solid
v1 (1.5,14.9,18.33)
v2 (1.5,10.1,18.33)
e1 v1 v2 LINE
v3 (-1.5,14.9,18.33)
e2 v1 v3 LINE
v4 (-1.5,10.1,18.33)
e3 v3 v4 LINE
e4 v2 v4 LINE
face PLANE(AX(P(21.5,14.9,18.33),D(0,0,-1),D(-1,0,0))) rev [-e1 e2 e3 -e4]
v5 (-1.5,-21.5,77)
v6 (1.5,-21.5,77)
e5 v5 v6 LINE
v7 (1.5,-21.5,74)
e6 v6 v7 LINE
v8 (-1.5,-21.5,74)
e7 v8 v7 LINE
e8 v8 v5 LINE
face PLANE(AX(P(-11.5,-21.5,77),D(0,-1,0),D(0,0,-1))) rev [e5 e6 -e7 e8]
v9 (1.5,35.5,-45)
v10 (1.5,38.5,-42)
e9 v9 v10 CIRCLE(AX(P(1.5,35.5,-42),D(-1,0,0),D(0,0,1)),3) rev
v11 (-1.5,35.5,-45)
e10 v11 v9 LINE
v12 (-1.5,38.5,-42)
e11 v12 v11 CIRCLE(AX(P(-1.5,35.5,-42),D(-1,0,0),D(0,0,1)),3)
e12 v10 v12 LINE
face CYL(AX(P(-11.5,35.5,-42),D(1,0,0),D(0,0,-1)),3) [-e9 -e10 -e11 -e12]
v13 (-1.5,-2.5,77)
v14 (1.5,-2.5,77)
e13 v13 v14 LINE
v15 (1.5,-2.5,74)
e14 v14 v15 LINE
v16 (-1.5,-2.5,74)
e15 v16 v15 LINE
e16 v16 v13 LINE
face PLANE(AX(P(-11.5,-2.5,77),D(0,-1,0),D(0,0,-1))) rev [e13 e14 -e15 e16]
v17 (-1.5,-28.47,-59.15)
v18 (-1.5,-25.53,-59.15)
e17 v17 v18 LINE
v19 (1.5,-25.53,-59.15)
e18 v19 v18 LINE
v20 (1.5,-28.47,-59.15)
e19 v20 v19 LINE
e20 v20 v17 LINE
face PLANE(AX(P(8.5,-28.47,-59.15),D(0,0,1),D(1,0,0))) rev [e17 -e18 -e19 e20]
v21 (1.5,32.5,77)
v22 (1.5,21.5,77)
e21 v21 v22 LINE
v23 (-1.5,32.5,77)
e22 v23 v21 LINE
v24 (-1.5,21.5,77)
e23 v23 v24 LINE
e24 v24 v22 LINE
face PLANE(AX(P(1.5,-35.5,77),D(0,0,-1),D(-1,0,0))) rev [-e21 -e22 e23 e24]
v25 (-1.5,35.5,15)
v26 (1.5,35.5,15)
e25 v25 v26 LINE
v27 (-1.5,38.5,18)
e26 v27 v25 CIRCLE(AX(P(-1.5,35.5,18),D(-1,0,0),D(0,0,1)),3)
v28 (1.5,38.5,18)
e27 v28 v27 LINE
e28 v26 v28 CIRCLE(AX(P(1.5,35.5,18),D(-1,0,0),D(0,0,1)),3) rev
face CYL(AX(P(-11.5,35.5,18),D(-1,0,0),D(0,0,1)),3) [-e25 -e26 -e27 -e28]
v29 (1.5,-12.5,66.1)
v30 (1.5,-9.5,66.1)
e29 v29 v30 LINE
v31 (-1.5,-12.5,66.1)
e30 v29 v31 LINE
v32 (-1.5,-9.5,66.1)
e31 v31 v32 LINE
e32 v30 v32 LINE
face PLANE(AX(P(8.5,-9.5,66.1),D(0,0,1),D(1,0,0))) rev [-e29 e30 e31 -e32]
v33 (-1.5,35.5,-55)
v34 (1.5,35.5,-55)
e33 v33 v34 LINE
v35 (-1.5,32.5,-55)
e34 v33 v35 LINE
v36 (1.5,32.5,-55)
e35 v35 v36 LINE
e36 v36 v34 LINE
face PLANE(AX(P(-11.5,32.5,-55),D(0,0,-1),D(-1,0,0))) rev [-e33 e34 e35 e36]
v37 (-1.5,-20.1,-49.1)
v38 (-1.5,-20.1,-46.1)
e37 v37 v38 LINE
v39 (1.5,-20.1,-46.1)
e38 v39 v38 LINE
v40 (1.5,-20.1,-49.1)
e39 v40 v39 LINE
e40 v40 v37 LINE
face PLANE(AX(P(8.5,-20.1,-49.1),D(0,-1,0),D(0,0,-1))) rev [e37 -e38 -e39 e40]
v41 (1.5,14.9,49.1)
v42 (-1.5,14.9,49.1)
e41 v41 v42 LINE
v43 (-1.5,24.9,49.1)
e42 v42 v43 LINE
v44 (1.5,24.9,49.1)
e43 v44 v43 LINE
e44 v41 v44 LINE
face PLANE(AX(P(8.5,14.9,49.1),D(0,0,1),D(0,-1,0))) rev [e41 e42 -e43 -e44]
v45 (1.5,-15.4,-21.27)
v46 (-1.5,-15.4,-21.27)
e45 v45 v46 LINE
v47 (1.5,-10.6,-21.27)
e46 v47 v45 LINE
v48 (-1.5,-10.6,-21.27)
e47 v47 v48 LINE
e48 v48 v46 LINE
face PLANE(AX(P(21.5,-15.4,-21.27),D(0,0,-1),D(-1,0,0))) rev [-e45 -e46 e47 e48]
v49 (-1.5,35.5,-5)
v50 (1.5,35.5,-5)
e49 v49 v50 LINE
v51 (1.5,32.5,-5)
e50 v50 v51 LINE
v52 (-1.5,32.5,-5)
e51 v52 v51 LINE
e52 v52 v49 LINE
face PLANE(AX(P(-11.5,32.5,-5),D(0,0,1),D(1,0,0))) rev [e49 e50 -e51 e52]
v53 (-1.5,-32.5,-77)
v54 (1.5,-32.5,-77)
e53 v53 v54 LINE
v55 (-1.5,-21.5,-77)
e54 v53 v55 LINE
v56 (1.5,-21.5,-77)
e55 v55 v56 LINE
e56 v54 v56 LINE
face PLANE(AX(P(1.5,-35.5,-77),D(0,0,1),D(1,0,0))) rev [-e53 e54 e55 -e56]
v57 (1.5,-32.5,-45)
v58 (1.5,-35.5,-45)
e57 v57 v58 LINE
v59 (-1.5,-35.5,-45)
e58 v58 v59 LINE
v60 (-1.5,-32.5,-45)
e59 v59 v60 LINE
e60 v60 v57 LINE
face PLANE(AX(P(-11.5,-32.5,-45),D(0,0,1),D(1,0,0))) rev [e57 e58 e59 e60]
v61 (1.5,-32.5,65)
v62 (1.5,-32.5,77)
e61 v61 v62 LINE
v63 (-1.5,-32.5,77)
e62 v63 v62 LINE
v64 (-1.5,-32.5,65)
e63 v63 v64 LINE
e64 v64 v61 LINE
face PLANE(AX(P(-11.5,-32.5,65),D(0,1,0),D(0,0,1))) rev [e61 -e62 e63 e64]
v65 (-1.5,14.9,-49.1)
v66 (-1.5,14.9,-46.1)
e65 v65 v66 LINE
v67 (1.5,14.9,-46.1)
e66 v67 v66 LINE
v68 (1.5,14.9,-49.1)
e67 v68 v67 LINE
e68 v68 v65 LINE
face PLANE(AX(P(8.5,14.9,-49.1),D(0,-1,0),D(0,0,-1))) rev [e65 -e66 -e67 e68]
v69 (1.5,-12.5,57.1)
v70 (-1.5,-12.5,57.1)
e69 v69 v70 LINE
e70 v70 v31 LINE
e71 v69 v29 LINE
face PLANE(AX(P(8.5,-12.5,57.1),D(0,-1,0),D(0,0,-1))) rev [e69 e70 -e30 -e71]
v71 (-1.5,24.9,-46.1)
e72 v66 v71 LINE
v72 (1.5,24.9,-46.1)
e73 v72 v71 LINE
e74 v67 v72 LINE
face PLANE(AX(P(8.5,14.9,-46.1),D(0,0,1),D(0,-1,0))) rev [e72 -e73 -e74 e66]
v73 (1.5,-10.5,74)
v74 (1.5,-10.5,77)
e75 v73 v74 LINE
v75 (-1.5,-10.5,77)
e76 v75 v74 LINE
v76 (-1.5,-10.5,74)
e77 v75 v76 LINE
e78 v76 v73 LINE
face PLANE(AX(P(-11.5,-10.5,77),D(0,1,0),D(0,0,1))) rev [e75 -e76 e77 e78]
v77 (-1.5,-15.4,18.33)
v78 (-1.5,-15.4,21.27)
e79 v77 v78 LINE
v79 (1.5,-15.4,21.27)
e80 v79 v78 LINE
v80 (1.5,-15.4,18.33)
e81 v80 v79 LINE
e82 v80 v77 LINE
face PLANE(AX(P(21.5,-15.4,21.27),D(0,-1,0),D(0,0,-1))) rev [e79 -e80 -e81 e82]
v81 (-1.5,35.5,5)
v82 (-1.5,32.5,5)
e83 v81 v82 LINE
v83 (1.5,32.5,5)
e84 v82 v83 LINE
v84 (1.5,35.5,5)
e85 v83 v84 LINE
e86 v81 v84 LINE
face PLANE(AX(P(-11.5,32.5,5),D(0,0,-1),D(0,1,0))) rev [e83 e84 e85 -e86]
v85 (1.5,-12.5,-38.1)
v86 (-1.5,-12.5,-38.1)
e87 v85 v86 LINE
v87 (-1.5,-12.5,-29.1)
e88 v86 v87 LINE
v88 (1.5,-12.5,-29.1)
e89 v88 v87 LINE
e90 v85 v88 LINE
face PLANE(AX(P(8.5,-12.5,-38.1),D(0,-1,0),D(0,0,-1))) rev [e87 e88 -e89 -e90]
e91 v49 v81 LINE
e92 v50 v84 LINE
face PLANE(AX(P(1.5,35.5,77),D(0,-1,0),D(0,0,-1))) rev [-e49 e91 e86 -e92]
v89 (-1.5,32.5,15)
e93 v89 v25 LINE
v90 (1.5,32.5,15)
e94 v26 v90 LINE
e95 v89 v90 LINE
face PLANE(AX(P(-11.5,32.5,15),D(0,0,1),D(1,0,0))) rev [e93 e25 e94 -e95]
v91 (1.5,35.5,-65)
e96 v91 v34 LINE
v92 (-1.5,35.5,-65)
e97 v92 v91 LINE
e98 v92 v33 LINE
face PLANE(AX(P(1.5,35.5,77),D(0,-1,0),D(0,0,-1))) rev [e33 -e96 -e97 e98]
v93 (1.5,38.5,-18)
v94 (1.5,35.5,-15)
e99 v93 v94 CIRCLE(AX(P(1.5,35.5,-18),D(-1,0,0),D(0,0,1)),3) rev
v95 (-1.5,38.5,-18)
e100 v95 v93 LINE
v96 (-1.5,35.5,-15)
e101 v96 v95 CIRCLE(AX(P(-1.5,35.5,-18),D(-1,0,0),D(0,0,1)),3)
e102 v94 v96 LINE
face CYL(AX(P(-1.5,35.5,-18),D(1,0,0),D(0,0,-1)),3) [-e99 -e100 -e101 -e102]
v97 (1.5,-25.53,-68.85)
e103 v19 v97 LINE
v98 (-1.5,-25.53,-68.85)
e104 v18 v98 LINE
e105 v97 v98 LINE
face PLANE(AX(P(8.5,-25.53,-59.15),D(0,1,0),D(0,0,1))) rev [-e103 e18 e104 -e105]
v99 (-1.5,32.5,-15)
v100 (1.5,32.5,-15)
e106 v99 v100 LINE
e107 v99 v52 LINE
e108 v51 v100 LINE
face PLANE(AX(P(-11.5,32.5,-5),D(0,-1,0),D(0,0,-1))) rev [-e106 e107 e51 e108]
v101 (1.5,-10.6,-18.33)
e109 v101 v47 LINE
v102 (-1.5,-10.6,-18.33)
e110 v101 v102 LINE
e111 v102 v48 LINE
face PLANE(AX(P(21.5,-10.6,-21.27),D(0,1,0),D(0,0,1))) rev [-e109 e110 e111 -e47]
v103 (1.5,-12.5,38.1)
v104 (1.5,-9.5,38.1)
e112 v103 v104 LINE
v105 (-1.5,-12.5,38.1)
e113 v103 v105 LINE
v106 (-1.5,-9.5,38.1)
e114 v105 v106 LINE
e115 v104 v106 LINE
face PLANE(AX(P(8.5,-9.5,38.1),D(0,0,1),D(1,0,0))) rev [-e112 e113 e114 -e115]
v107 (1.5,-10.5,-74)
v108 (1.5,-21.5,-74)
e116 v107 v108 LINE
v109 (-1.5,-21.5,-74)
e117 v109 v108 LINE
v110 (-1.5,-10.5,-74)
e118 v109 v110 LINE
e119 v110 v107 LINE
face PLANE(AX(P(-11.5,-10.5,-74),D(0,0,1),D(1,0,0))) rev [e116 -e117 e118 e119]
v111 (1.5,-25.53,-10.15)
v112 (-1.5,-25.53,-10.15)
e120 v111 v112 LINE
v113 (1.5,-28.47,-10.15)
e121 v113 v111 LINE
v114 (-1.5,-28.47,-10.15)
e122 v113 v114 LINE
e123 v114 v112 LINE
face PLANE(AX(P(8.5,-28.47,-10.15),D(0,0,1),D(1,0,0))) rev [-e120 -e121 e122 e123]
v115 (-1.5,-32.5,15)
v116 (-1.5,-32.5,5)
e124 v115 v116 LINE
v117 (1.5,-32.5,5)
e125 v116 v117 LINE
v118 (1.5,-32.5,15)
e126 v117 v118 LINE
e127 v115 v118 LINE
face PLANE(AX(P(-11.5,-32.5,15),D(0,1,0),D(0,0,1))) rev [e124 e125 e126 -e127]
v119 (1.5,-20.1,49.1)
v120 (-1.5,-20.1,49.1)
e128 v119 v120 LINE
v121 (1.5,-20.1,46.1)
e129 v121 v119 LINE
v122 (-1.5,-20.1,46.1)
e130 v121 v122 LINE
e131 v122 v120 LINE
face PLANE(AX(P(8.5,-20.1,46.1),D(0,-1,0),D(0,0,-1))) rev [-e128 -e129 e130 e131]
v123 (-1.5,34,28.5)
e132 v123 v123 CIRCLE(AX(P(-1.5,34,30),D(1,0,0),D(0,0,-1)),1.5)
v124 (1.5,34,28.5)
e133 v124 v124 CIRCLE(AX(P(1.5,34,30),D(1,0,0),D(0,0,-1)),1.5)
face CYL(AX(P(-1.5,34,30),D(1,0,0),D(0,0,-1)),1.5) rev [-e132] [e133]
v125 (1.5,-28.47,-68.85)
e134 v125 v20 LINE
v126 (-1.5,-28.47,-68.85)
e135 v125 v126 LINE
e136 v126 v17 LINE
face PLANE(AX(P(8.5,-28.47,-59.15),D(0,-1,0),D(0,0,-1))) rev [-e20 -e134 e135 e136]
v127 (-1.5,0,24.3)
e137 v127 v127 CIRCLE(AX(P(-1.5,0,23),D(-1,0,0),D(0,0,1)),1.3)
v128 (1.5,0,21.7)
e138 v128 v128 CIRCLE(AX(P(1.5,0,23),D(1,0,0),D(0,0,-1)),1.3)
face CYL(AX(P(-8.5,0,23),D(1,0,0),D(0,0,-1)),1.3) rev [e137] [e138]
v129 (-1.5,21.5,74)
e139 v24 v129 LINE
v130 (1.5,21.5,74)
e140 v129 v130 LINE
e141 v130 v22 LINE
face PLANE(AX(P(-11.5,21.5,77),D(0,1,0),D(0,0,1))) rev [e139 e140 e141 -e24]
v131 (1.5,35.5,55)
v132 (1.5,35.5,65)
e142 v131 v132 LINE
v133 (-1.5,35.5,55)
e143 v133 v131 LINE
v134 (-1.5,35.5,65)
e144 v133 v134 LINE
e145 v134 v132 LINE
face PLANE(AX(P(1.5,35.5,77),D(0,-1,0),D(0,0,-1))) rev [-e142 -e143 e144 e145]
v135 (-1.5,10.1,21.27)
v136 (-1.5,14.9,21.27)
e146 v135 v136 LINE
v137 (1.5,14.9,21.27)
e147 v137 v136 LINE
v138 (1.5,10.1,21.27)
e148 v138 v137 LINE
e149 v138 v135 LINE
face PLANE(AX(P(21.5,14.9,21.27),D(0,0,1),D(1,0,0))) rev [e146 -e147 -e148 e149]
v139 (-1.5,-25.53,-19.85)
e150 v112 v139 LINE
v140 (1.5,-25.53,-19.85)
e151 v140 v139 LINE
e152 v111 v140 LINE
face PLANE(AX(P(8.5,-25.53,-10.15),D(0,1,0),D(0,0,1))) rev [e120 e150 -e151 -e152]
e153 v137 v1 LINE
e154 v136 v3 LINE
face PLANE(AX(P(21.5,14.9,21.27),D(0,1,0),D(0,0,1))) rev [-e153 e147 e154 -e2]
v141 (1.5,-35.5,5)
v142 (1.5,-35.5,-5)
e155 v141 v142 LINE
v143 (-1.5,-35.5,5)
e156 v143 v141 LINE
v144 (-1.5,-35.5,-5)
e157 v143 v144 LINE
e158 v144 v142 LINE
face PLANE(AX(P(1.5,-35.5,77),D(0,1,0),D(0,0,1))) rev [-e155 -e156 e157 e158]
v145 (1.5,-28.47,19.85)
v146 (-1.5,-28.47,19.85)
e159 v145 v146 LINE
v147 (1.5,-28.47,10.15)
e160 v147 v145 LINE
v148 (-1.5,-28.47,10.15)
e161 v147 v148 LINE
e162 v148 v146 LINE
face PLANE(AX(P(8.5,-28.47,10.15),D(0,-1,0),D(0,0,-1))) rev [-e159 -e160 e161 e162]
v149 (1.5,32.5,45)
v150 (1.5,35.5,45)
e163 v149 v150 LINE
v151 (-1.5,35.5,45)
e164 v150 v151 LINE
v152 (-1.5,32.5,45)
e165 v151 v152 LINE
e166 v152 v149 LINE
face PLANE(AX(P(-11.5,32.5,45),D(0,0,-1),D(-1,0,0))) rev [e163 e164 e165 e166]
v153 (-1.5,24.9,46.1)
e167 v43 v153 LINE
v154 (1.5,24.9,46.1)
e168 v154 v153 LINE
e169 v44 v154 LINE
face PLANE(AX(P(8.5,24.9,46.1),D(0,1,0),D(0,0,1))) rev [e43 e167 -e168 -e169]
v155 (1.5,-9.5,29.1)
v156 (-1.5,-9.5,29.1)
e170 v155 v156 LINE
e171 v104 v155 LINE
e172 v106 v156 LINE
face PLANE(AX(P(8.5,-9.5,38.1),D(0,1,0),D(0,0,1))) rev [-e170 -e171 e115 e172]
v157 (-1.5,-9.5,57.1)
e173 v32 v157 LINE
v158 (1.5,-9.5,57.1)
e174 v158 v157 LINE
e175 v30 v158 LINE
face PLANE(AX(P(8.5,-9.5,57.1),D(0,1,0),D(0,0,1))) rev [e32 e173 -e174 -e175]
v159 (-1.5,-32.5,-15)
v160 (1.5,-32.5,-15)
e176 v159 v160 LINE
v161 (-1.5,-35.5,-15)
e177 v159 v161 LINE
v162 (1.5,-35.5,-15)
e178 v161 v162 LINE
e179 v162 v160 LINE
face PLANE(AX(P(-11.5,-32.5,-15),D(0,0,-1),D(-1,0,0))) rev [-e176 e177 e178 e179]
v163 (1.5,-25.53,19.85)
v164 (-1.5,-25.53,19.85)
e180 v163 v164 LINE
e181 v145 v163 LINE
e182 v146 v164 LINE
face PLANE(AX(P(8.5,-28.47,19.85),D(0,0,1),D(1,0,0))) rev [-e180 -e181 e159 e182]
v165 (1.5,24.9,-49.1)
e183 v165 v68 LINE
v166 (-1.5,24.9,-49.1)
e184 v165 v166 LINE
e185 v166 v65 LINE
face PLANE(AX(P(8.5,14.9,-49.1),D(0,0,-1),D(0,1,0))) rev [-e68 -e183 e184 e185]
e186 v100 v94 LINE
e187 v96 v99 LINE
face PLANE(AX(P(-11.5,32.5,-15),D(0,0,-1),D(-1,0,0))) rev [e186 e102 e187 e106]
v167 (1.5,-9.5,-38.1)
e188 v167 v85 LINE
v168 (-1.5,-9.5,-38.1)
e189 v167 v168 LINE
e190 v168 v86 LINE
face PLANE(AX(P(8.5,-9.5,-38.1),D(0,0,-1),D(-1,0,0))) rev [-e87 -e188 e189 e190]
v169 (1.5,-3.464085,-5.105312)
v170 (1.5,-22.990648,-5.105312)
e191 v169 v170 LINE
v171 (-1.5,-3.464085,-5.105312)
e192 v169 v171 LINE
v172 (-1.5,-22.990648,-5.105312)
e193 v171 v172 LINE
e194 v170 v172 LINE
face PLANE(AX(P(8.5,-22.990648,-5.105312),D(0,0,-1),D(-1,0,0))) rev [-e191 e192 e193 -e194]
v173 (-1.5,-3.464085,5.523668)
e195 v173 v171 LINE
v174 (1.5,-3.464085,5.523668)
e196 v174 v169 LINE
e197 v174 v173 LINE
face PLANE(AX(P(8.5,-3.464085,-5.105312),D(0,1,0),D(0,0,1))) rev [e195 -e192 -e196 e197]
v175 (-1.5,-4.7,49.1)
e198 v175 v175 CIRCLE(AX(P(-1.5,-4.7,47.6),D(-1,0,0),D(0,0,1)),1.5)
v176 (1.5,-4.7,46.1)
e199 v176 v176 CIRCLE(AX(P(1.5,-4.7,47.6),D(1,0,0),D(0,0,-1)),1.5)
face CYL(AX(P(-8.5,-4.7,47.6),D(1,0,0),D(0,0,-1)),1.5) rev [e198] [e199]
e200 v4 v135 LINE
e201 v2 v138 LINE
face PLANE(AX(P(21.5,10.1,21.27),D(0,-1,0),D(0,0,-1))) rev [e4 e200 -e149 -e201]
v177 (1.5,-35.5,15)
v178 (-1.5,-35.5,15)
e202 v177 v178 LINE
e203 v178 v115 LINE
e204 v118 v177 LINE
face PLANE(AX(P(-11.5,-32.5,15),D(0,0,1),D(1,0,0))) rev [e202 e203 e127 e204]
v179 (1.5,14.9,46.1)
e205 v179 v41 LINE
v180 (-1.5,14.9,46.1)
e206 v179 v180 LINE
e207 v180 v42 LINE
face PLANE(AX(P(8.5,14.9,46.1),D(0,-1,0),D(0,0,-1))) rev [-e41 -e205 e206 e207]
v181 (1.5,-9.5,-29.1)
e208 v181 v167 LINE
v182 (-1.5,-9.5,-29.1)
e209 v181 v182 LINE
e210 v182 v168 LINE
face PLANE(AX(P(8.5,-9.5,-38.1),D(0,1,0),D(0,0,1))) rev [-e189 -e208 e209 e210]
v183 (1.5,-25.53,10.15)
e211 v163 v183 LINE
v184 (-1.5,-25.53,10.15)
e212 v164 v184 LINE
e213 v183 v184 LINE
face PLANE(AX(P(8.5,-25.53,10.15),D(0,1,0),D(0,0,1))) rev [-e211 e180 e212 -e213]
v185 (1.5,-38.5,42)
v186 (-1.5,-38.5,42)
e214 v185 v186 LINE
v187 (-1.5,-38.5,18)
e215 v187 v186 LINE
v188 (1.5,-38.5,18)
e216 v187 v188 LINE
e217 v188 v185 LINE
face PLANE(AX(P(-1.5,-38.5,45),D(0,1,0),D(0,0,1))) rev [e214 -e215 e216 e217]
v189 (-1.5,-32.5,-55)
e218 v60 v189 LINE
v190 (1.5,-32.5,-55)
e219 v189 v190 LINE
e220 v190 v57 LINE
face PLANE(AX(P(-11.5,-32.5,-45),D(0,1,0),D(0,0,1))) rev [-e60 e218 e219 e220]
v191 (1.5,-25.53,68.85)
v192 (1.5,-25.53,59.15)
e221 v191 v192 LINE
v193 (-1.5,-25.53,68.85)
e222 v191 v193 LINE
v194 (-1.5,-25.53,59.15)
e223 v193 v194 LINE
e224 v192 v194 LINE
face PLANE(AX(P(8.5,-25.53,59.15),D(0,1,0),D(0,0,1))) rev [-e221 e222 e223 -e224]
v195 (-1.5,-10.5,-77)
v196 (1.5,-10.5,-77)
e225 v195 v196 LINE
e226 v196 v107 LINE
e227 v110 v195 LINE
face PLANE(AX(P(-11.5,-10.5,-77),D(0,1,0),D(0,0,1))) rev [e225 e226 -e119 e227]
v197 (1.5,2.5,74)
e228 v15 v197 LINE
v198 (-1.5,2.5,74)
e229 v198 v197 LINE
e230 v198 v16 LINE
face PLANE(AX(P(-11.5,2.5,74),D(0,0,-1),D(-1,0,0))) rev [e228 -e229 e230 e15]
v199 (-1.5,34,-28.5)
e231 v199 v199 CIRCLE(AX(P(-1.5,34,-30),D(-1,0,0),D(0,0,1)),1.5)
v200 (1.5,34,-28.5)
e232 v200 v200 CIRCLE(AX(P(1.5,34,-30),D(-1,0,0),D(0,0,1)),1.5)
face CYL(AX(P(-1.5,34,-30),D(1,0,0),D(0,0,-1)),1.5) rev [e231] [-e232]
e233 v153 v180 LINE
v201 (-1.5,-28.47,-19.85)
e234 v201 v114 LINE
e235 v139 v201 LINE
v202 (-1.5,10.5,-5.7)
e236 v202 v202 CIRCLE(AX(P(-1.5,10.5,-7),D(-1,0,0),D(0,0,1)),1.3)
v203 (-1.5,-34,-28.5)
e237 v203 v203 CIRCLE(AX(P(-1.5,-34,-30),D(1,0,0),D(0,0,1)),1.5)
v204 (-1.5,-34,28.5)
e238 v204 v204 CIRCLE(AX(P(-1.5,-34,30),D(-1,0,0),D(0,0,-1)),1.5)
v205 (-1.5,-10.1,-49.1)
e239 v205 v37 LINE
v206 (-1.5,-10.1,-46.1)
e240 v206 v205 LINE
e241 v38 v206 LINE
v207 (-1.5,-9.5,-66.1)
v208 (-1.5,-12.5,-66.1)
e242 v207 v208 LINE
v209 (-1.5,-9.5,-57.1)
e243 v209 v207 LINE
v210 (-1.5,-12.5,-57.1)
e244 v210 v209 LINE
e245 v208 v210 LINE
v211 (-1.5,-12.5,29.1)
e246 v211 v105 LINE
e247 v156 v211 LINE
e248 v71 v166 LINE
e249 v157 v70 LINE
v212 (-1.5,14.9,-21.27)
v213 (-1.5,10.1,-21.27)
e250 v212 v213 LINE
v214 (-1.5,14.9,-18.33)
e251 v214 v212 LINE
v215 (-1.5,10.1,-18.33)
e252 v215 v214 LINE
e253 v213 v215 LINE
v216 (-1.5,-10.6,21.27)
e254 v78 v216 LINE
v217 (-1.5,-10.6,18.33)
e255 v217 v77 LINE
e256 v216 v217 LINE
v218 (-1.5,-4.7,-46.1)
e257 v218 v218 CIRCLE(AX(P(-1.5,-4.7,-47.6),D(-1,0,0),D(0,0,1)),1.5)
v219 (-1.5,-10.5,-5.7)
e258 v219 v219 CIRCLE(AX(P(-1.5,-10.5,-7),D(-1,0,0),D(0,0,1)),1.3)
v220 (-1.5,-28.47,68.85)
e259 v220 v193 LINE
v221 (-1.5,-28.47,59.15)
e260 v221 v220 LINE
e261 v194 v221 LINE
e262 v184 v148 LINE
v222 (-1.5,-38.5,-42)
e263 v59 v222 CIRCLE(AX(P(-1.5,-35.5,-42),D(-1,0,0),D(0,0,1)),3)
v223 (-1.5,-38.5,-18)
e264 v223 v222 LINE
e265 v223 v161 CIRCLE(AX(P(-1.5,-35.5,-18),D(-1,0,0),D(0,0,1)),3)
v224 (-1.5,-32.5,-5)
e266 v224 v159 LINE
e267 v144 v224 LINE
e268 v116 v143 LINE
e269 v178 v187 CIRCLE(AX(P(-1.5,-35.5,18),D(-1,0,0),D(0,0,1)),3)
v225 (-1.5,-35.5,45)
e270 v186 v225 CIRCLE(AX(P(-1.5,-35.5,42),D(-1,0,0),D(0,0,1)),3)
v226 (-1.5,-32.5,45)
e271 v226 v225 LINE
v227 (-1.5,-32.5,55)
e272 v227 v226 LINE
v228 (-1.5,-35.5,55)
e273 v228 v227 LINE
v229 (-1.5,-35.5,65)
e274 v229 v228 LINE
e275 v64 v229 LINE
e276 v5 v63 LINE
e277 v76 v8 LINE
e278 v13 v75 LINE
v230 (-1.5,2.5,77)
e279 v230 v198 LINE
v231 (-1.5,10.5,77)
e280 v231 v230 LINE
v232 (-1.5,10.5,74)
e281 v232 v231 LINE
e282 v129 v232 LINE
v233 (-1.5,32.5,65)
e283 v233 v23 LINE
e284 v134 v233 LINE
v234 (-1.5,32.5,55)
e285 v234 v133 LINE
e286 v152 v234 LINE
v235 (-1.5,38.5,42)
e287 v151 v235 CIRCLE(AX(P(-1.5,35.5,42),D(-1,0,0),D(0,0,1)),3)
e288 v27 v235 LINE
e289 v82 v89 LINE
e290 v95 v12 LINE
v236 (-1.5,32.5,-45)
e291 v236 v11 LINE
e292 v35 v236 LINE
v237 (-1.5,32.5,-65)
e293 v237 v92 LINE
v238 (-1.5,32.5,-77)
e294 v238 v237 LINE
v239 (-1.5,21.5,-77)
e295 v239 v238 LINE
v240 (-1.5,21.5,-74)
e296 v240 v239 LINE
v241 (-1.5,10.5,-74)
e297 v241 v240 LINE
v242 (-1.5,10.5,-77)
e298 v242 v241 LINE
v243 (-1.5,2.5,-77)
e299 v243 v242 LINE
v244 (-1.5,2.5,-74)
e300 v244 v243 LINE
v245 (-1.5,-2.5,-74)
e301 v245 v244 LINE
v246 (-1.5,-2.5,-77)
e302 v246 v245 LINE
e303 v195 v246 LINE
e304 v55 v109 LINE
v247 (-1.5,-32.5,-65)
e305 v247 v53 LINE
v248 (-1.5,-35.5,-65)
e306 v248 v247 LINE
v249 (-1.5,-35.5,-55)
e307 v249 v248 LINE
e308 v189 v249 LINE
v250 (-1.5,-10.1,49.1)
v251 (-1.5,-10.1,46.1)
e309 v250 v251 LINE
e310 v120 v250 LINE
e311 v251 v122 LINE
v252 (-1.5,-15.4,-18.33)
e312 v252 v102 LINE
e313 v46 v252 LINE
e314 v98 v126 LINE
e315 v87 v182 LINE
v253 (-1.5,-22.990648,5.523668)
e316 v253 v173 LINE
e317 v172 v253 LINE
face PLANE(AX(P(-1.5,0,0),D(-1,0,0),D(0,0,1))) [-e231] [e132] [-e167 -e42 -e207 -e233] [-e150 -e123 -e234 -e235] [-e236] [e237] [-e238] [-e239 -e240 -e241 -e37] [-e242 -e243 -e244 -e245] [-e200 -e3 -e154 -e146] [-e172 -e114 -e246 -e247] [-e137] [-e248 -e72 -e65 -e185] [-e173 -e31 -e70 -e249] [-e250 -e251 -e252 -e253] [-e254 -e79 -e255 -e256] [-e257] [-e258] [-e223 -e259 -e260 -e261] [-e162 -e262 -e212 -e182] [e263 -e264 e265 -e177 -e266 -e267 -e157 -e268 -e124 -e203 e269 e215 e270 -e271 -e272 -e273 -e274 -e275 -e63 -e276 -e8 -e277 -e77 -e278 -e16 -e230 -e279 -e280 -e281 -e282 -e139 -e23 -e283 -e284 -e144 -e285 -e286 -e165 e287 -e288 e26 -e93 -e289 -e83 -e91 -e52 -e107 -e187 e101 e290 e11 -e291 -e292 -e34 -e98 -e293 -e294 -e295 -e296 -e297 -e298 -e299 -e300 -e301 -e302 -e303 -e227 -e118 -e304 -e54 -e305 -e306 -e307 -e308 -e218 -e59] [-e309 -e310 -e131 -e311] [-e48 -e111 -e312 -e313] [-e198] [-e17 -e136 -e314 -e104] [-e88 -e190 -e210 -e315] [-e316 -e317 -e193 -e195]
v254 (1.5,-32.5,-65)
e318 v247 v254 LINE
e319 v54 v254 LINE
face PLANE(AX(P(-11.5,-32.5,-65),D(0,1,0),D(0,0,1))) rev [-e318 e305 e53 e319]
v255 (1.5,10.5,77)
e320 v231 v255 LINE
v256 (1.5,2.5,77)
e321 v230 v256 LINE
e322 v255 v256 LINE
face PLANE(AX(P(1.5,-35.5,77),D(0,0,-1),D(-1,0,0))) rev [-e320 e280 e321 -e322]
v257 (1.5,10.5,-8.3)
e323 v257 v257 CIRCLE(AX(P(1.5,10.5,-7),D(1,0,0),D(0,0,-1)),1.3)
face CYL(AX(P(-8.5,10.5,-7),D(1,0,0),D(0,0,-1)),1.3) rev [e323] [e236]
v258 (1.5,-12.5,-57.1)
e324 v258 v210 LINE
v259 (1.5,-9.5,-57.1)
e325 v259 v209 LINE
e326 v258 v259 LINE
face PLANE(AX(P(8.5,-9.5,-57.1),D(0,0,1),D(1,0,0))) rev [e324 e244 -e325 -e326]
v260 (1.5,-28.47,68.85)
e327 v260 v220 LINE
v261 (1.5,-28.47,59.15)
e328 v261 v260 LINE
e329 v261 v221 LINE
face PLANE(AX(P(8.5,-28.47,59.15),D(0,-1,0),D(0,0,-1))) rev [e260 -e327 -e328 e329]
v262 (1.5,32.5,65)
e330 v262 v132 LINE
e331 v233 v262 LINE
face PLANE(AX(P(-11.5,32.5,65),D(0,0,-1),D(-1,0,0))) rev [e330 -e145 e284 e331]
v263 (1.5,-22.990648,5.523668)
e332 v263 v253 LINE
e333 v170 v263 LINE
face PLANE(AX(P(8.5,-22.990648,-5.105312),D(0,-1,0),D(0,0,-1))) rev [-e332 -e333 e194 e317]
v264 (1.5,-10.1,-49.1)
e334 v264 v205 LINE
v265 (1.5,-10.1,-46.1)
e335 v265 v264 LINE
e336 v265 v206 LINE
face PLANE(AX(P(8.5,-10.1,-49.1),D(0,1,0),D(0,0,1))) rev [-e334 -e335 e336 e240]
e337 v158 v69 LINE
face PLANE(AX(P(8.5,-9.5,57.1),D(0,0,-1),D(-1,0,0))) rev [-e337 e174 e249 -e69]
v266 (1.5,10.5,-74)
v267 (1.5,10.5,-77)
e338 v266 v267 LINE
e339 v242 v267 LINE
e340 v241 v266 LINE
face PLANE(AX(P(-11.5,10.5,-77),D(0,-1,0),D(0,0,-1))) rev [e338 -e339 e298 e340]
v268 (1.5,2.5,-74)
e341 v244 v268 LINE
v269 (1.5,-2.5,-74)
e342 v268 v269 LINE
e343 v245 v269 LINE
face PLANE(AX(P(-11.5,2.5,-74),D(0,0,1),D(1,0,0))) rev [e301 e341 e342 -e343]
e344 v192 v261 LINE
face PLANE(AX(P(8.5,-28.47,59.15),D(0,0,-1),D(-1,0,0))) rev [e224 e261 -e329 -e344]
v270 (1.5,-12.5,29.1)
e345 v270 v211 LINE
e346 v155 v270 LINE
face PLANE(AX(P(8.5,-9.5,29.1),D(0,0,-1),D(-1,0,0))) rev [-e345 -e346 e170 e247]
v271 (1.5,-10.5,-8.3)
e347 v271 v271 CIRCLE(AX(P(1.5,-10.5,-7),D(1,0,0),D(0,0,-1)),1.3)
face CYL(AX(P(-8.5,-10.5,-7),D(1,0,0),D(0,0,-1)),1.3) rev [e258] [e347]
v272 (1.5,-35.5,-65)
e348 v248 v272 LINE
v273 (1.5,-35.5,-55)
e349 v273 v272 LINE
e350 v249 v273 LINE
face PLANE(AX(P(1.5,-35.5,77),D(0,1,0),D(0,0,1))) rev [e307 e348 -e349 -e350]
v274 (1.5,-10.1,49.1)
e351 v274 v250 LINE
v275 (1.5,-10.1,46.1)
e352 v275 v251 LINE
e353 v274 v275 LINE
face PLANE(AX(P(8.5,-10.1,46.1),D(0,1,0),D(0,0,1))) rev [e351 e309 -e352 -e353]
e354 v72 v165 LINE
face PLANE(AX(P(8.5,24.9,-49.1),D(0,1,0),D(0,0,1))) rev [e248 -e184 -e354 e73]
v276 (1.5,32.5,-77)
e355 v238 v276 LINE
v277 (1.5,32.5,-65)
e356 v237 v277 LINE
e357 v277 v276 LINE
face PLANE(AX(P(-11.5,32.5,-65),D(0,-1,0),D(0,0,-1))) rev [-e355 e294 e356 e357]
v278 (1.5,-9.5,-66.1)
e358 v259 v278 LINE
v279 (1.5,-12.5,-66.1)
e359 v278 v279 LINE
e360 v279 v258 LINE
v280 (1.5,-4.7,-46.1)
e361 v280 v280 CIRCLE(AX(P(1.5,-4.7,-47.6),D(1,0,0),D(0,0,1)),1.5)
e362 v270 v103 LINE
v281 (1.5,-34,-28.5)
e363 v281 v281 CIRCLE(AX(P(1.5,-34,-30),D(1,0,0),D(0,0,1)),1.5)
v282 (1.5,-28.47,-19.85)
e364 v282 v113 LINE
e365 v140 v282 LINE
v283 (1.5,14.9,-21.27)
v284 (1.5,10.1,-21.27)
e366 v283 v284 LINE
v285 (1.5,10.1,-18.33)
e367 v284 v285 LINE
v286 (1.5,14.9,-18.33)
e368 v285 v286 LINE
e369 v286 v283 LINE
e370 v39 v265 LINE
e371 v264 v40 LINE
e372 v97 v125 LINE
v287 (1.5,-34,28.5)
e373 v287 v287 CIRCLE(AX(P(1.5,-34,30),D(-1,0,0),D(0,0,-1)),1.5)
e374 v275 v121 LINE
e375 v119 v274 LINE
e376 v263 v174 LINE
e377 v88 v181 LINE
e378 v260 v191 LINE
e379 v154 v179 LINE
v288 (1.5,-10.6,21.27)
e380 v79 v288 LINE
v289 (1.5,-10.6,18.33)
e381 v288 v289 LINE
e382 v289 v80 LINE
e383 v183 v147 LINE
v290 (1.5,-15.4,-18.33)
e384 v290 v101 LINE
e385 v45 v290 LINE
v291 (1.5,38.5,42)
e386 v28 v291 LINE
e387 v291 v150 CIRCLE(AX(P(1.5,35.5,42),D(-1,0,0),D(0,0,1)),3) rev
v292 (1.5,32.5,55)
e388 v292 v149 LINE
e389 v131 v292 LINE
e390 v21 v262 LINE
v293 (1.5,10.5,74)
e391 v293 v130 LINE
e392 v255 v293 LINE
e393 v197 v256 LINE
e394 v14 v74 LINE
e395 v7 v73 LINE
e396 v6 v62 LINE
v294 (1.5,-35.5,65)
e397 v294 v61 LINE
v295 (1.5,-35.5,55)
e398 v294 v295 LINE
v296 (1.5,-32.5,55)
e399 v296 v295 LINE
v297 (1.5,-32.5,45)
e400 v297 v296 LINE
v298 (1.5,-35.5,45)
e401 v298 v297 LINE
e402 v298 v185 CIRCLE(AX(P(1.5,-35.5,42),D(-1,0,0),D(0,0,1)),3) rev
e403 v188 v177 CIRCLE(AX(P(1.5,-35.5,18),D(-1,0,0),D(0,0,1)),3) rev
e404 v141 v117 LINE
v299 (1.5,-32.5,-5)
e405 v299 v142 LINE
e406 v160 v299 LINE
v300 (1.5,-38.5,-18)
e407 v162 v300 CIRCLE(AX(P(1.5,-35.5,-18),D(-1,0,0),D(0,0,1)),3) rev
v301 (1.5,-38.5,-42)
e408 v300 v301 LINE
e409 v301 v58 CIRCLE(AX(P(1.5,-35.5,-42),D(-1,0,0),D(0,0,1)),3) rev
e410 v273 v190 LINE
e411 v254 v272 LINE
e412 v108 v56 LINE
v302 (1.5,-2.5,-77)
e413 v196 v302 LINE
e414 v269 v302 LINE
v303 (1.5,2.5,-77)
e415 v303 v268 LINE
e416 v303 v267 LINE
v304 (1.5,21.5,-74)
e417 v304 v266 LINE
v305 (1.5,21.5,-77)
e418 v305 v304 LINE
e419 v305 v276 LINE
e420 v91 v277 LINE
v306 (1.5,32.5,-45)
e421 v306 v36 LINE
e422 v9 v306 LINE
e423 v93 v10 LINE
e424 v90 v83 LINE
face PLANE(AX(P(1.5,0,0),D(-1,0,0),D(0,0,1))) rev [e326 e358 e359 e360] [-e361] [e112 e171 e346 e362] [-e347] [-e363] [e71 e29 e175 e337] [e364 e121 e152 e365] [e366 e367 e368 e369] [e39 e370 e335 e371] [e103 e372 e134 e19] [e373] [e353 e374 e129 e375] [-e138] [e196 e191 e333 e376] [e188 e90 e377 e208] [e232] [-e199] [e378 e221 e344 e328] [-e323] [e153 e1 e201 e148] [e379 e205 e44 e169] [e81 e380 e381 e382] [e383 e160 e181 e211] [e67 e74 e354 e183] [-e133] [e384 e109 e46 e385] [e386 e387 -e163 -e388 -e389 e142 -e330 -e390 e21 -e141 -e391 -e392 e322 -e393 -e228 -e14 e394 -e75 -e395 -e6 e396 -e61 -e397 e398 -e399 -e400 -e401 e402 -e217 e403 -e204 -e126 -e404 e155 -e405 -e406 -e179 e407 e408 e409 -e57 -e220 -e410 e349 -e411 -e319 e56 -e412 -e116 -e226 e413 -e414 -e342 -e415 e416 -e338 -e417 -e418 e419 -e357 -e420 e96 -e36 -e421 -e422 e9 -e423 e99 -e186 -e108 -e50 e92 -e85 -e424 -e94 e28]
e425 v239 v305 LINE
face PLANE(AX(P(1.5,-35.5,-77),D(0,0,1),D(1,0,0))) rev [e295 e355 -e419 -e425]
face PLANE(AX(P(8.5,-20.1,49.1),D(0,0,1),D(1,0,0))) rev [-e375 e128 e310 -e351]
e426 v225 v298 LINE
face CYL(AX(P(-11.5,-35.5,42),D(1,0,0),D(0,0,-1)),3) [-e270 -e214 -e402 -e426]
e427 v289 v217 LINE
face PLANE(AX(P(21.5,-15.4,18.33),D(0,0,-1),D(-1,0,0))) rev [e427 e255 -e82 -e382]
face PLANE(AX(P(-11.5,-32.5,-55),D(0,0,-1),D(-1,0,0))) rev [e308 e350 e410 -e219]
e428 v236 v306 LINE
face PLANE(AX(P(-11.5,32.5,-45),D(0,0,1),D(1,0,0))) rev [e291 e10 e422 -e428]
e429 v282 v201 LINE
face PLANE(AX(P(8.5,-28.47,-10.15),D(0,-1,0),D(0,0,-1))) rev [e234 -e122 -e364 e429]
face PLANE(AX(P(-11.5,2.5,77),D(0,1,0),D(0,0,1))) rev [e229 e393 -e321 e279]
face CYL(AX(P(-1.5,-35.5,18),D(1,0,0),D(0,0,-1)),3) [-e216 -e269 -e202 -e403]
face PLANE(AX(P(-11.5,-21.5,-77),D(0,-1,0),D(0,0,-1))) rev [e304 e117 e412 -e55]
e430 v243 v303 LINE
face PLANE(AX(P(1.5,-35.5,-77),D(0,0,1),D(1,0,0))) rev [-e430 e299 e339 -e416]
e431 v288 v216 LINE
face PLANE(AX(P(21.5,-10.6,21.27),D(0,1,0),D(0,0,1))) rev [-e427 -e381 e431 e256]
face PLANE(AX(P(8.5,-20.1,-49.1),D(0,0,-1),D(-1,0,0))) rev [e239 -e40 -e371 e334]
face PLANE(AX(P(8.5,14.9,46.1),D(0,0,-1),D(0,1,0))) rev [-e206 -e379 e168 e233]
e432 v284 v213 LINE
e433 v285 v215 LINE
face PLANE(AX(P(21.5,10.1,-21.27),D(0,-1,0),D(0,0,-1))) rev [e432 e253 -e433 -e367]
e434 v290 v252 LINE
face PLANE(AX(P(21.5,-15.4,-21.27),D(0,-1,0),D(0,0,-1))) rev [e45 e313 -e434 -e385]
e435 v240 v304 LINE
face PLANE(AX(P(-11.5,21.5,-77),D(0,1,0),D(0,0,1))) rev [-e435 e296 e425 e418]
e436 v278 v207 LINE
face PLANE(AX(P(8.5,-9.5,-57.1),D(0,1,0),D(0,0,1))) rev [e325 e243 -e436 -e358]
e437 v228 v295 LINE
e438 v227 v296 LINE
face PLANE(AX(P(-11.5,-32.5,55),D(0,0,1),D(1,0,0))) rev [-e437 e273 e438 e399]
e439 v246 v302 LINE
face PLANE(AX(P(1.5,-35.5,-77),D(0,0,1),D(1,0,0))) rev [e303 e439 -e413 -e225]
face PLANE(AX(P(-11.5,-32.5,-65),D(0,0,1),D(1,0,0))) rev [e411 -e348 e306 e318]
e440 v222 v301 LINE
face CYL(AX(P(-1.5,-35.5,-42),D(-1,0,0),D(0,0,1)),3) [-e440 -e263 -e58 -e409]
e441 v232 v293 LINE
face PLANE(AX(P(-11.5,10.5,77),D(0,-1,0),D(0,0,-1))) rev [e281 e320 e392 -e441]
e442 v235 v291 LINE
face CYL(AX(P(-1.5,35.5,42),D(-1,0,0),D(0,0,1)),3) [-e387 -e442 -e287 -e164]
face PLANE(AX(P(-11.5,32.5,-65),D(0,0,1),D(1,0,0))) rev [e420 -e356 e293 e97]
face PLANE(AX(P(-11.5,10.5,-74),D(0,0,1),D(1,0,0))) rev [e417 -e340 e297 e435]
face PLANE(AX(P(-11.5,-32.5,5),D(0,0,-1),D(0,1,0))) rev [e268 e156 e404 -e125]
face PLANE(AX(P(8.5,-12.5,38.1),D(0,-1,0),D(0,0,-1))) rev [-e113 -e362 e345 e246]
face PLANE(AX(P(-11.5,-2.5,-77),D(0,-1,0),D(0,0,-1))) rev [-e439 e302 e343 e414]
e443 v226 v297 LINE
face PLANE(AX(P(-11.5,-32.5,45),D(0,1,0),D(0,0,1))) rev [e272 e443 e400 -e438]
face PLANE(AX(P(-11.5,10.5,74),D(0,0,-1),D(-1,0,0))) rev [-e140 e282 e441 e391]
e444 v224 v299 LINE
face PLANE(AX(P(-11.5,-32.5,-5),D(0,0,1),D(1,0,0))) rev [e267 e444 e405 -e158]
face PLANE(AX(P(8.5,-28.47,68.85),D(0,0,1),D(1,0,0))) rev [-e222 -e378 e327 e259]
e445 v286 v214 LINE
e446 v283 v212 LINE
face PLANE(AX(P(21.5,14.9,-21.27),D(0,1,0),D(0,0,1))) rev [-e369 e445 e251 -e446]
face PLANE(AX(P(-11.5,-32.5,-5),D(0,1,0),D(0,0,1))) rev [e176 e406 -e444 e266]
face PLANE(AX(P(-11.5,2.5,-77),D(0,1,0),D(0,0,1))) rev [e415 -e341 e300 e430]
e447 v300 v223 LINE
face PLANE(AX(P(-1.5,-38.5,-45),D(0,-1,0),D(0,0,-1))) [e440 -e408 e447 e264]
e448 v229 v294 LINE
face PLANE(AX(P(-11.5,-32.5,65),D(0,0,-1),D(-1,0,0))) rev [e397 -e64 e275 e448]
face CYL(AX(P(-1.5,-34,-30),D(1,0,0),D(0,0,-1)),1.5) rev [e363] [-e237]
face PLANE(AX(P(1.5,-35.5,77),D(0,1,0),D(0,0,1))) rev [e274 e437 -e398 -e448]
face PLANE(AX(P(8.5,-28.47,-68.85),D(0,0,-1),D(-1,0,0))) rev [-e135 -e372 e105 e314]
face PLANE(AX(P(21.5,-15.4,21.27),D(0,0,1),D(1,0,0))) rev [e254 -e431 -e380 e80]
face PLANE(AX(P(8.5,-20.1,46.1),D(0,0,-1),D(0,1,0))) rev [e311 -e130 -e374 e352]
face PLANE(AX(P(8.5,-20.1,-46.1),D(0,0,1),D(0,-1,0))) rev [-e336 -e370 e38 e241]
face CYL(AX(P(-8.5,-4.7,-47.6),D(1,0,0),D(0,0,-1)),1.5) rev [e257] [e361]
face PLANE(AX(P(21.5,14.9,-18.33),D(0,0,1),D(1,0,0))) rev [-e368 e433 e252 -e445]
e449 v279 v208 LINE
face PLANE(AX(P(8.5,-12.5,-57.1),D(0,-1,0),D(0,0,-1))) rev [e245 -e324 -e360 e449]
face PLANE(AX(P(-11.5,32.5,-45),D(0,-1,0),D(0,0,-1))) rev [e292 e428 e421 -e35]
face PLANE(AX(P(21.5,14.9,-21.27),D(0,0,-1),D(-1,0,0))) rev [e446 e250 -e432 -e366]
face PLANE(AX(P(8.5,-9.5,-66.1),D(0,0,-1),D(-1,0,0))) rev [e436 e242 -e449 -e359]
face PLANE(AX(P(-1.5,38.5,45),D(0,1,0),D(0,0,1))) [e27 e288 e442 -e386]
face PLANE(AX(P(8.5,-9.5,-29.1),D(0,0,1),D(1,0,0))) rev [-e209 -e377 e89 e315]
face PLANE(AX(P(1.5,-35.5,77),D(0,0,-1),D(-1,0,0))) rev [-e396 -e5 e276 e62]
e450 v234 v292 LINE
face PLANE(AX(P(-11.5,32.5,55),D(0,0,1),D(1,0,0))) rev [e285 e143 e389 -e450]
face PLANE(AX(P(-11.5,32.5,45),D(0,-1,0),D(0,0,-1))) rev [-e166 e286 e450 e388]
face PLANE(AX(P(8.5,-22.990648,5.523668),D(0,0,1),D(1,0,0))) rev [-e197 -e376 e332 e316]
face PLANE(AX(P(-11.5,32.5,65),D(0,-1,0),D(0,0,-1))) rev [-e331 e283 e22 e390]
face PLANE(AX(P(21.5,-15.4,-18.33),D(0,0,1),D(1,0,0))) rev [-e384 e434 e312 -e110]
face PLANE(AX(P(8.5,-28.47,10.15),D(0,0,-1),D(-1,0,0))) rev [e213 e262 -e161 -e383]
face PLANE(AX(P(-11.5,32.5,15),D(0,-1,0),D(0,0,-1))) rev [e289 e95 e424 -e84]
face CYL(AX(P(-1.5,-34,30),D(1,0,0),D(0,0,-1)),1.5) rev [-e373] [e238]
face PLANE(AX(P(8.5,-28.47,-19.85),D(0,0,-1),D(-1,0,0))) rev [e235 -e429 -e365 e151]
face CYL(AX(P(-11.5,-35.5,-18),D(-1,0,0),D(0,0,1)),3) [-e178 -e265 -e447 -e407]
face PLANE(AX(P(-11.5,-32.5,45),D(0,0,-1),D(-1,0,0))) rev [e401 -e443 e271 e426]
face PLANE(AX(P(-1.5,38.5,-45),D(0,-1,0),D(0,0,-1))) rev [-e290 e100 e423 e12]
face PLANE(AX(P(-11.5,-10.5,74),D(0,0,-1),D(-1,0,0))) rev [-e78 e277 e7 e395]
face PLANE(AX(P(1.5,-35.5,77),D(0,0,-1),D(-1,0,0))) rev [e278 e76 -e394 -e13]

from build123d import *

# Parameters (mm, degrees)
CROQUIS1_W               = 154
CROQUIS1_H               = 71
SALIENTE_EXTRUIR1_DEPTH  = 1.5
CROQUIS2_W               = 12
CROQUIS2_H               = 3
CROQUIS2_W_2             = 10
CROQUIS2_W_3             = 3
CROQUIS2_H_2             = 11
CROQUIS2_H_3             = 5
CORTAR_EXTRUIR1_DEPTH    = 13
CROQUIS4_W               = 30
CROQUIS4_H               = 3
SALIENTE_EXTRUIR3_DEPTH  = 3
REDONDEO2_R              = 3
CROQUIS5_R               = 1.5
CORTAR_EXTRUIR2_DEPTH    = 3
REDONDEO2_OF_SIMETR_A4_R = 3
SIMETR_A5_START          = -2
SIMETR_A5_OUTLINE_R      = 1.5
SIMETR_A5_DEPTH          = 4
SIMETR_A5_START_2        = -1.5
SIMETR_A5_2_DEPTH        = 3
CROQUIS6_W               = 3
CROQUIS6_H               = 10
CROQUIS6_W_2             = 9.7
CROQUIS6_H_2             = 2.94
CROQUIS6_W_3             = 10.628979849
CROQUIS6_H_3             = 19.526562675
CORTAR_EXTRUIR3_DEPTH    = 10
CROQUIS7_R               = 1.5
CORTAR_EXTRUIR4_DEPTH    = 10
CROQUIS8_W               = 9
CROQUIS8_H               = 3
CORTAR_EXTRUIR5_DEPTH    = 10
CROQUIS9_R               = 1.3
CORTAR_EXTRUIR6_DEPTH    = 10
CROQUIS10_W              = 2.94
CROQUIS10_H              = 4.8
CORTAR_EXTRUIR7_DEPTH    = 23


with BuildPart() as part:
    # Croquis1 → Saliente-Extruir1 (new, symmetric)
    with BuildSketch(Plane(origin=(0, 0, 0), x_dir=(0, 0, -1), z_dir=(1, 0, 0))):
        Rectangle(CROQUIS1_W, CROQUIS1_H)
    extrude(amount=SALIENTE_EXTRUIR1_DEPTH, both=True)

    # Croquis2 → Cortar-Extruir1 (cut)
    with BuildSketch(Plane(origin=(1.5, 0, 0), x_dir=(0, 0, -1), z_dir=(1, 0, 0))):
        with Locations((-71, 34)):
            Rectangle(CROQUIS2_W, CROQUIS2_H)
        with Locations((-50, 34)):
            Rectangle(CROQUIS2_W_2, CROQUIS2_H)
        with Locations((-10, 34)):
            Rectangle(CROQUIS2_W_2, CROQUIS2_H)
        with Locations((10, 34)):
            Rectangle(CROQUIS2_W_2, CROQUIS2_H)
        with Locations((50, 34)):
            Rectangle(CROQUIS2_W_2, CROQUIS2_H)
        with Locations((71, 34)):
            Rectangle(CROQUIS2_W, CROQUIS2_H)
        with Locations((50, -34)):
            Rectangle(CROQUIS2_W_2, CROQUIS2_H)
        with Locations((10, -34)):
            Rectangle(CROQUIS2_W_2, CROQUIS2_H)
        with Locations((-10, -34)):
            Rectangle(CROQUIS2_W_2, CROQUIS2_H)
        with Locations((-50, -34)):
            Rectangle(CROQUIS2_W_2, CROQUIS2_H)
        with Locations((-71, -34)):
            Rectangle(CROQUIS2_W, CROQUIS2_H)
        with Locations((71, -34)):
            Rectangle(CROQUIS2_W, CROQUIS2_H)
        with Locations((-75.5, -16)):
            Rectangle(CROQUIS2_W_3, CROQUIS2_H_2)
        with Locations((-75.5, 0)):
            Rectangle(CROQUIS2_W_3, CROQUIS2_H_3)
        with Locations((-75.5, 16)):
            Rectangle(CROQUIS2_W_3, CROQUIS2_H_2)
        with Locations((75.5, -16)):
            Rectangle(CROQUIS2_W_3, CROQUIS2_H_2)
        with Locations((75.5, 16)):
            Rectangle(CROQUIS2_W_3, CROQUIS2_H_2)
        with Locations((75.5, 0)):
            Rectangle(CROQUIS2_W_3, CROQUIS2_H_3)
    extrude(amount=-CORTAR_EXTRUIR1_DEPTH, mode=Mode.SUBTRACT)

    # Croquis4 → Saliente-Extruir3 (add)
    with BuildSketch(Plane(origin=(1.5, 0, 0), x_dir=(0, 0, -1), z_dir=(1, 0, 0))):
        with Locations((-30, 37)):
            Rectangle(CROQUIS4_W, CROQUIS4_H)
    saliente_extruir3 = extrude(amount=-SALIENTE_EXTRUIR3_DEPTH)

    # Redondeo2
    redondeo2_edges = [part.edges().sort_by_distance(p)[0] for p in [
        (0, 38.5, 45),
        (0, 38.5, 15),
    ]]
    fillet(redondeo2_edges, radius=REDONDEO2_R)

    # Croquis5 → Cortar-Extruir2 (cut)
    with BuildSketch(Plane(origin=(1.5, 0, 0), x_dir=(0, 0, -1), z_dir=(1, 0, 0))):
        with Locations((-30, 34)):
            Circle(CROQUIS5_R)
    cortar_extruir2 = extrude(amount=-CORTAR_EXTRUIR2_DEPTH, mode=Mode.SUBTRACT)

    # Simetría4: Saliente-Extruir3, Cortar-Extruir2 across plane
    add(saliente_extruir3.mirror(Plane.ZX))
    add(cortar_extruir2.mirror(Plane.ZX), mode=Mode.SUBTRACT)

    # Redondeo2 of Simetría4
    redondeo2_of_simetr_a4_edges = [part.edges().sort_by_distance(p)[0] for p in [
        (0, -38.5, 45),
        (0, -38.5, 15),
    ]]
    fillet(redondeo2_of_simetr_a4_edges, radius=REDONDEO2_OF_SIMETR_A4_R)

    # Simetría5: read off the stored shape, not the designer's step
    # Simetría5 outline → Simetría5 (cut)
    with BuildSketch(Plane.YZ.offset(SIMETR_A5_START)):
        with Locations((34, -30)):
            Circle(SIMETR_A5_OUTLINE_R)
        with Locations((-34, -30)):
            Circle(SIMETR_A5_OUTLINE_R)
    extrude(amount=SIMETR_A5_DEPTH, mode=Mode.SUBTRACT)

    # Simetr_a5 2 outline → Simetr_a5 2 (add)
    with BuildSketch(Plane.YZ.offset(SIMETR_A5_START_2)):
        with BuildLine():
            Line((38.5, -42), (38.5, -18))
            ThreePointArc((38.5, -18), (37.621320344, -15.878679656), (35.5, -15))
            Line((35.5, -15), (35.5, -45))
            ThreePointArc((35.5, -45), (37.621320344, -44.121320344), (38.5, -42))
        make_face()
        with BuildLine():
            ThreePointArc((-35.5, -15), (-37.621320344, -15.878679656), (-38.5, -18))
            Line((-38.5, -18), (-38.5, -42))
            ThreePointArc((-38.5, -42), (-37.621320344, -44.121320344), (-35.5, -45))
            Line((-35.5, -45), (-35.5, -15))
        make_face()
    extrude(amount=SIMETR_A5_2_DEPTH)

    # Croquis6 → Cortar-Extruir3 (cut)
    with BuildSketch(Plane.ZY.offset(1.5)):
        with Locations((47.6, -15.1)):
            Rectangle(CROQUIS6_W, CROQUIS6_H)
        with Locations((47.6, 19.9)):
            Rectangle(CROQUIS6_W, CROQUIS6_H)
        with Locations((-47.6, -15.1)):
            Rectangle(CROQUIS6_W, CROQUIS6_H)
        with Locations((-47.6, 19.9)):
            Rectangle(CROQUIS6_W, CROQUIS6_H)
        with Locations((15, -27)):
            Rectangle(CROQUIS6_W_2, CROQUIS6_H_2)
        with Locations((64, -27)):
            Rectangle(CROQUIS6_W_2, CROQUIS6_H_2)
        with Locations((-64, -27)):
            Rectangle(CROQUIS6_W_2, CROQUIS6_H_2)
        with Locations((-15, -27)):
            Rectangle(CROQUIS6_W_2, CROQUIS6_H_2)
        with Locations((0.209178282, -13.227366202)):
            Rectangle(CROQUIS6_W_3, CROQUIS6_H_3)
    extrude(amount=-CORTAR_EXTRUIR3_DEPTH, mode=Mode.SUBTRACT)

    # Croquis7 → Cortar-Extruir4 (cut)
    with BuildSketch(Plane(origin=(1.5, 0, 0), x_dir=(0, 0, -1), z_dir=(1, 0, 0))):
        with Locations((-47.6, -4.7)):
            Circle(CROQUIS7_R)
        with Locations(Location((47.6, -4.7, 0), (0, 0, 180))):
            Circle(CROQUIS7_R)
    extrude(amount=-CORTAR_EXTRUIR4_DEPTH, mode=Mode.SUBTRACT)

    # Croquis8 → Cortar-Extruir5 (cut)
    with BuildSketch(Plane.ZY.offset(1.5)):
        with Locations((-33.6, -11)):
            Rectangle(CROQUIS8_W, CROQUIS8_H)
        with Locations((-61.6, -11)):
            Rectangle(CROQUIS8_W, CROQUIS8_H)
        with Locations((33.6, -11)):
            Rectangle(CROQUIS8_W, CROQUIS8_H)
        with Locations((61.6, -11)):
            Rectangle(CROQUIS8_W, CROQUIS8_H)
    extrude(amount=-CORTAR_EXTRUIR5_DEPTH, mode=Mode.SUBTRACT)

    # Croquis9 → Cortar-Extruir6 (cut)
    with BuildSketch(Plane(origin=(1.5, 0, 0), x_dir=(0, 0, -1), z_dir=(1, 0, 0))):
        with Locations((-23, 0)):
            Circle(CROQUIS9_R)
        with Locations((7, 10.5)):
            Circle(CROQUIS9_R)
        with Locations((7, -10.5)):
            Circle(CROQUIS9_R)
    extrude(amount=-CORTAR_EXTRUIR6_DEPTH, mode=Mode.SUBTRACT)

    # Croquis10 → Cortar-Extruir7 (cut)
    with BuildSketch(Plane.ZY.offset(1.5)):
        with Locations((-19.8, 12.5)):
            Rectangle(CROQUIS10_W, CROQUIS10_H)
        with Locations((-19.8, -13)):
            Rectangle(CROQUIS10_W, CROQUIS10_H)
        with Locations((19.8, 12.5)):
            Rectangle(CROQUIS10_W, CROQUIS10_H)
        with Locations((19.8, -13)):
            Rectangle(CROQUIS10_W, CROQUIS10_H)
    extrude(amount=-CORTAR_EXTRUIR7_DEPTH, mode=Mode.SUBTRACT)


solid = part.part
